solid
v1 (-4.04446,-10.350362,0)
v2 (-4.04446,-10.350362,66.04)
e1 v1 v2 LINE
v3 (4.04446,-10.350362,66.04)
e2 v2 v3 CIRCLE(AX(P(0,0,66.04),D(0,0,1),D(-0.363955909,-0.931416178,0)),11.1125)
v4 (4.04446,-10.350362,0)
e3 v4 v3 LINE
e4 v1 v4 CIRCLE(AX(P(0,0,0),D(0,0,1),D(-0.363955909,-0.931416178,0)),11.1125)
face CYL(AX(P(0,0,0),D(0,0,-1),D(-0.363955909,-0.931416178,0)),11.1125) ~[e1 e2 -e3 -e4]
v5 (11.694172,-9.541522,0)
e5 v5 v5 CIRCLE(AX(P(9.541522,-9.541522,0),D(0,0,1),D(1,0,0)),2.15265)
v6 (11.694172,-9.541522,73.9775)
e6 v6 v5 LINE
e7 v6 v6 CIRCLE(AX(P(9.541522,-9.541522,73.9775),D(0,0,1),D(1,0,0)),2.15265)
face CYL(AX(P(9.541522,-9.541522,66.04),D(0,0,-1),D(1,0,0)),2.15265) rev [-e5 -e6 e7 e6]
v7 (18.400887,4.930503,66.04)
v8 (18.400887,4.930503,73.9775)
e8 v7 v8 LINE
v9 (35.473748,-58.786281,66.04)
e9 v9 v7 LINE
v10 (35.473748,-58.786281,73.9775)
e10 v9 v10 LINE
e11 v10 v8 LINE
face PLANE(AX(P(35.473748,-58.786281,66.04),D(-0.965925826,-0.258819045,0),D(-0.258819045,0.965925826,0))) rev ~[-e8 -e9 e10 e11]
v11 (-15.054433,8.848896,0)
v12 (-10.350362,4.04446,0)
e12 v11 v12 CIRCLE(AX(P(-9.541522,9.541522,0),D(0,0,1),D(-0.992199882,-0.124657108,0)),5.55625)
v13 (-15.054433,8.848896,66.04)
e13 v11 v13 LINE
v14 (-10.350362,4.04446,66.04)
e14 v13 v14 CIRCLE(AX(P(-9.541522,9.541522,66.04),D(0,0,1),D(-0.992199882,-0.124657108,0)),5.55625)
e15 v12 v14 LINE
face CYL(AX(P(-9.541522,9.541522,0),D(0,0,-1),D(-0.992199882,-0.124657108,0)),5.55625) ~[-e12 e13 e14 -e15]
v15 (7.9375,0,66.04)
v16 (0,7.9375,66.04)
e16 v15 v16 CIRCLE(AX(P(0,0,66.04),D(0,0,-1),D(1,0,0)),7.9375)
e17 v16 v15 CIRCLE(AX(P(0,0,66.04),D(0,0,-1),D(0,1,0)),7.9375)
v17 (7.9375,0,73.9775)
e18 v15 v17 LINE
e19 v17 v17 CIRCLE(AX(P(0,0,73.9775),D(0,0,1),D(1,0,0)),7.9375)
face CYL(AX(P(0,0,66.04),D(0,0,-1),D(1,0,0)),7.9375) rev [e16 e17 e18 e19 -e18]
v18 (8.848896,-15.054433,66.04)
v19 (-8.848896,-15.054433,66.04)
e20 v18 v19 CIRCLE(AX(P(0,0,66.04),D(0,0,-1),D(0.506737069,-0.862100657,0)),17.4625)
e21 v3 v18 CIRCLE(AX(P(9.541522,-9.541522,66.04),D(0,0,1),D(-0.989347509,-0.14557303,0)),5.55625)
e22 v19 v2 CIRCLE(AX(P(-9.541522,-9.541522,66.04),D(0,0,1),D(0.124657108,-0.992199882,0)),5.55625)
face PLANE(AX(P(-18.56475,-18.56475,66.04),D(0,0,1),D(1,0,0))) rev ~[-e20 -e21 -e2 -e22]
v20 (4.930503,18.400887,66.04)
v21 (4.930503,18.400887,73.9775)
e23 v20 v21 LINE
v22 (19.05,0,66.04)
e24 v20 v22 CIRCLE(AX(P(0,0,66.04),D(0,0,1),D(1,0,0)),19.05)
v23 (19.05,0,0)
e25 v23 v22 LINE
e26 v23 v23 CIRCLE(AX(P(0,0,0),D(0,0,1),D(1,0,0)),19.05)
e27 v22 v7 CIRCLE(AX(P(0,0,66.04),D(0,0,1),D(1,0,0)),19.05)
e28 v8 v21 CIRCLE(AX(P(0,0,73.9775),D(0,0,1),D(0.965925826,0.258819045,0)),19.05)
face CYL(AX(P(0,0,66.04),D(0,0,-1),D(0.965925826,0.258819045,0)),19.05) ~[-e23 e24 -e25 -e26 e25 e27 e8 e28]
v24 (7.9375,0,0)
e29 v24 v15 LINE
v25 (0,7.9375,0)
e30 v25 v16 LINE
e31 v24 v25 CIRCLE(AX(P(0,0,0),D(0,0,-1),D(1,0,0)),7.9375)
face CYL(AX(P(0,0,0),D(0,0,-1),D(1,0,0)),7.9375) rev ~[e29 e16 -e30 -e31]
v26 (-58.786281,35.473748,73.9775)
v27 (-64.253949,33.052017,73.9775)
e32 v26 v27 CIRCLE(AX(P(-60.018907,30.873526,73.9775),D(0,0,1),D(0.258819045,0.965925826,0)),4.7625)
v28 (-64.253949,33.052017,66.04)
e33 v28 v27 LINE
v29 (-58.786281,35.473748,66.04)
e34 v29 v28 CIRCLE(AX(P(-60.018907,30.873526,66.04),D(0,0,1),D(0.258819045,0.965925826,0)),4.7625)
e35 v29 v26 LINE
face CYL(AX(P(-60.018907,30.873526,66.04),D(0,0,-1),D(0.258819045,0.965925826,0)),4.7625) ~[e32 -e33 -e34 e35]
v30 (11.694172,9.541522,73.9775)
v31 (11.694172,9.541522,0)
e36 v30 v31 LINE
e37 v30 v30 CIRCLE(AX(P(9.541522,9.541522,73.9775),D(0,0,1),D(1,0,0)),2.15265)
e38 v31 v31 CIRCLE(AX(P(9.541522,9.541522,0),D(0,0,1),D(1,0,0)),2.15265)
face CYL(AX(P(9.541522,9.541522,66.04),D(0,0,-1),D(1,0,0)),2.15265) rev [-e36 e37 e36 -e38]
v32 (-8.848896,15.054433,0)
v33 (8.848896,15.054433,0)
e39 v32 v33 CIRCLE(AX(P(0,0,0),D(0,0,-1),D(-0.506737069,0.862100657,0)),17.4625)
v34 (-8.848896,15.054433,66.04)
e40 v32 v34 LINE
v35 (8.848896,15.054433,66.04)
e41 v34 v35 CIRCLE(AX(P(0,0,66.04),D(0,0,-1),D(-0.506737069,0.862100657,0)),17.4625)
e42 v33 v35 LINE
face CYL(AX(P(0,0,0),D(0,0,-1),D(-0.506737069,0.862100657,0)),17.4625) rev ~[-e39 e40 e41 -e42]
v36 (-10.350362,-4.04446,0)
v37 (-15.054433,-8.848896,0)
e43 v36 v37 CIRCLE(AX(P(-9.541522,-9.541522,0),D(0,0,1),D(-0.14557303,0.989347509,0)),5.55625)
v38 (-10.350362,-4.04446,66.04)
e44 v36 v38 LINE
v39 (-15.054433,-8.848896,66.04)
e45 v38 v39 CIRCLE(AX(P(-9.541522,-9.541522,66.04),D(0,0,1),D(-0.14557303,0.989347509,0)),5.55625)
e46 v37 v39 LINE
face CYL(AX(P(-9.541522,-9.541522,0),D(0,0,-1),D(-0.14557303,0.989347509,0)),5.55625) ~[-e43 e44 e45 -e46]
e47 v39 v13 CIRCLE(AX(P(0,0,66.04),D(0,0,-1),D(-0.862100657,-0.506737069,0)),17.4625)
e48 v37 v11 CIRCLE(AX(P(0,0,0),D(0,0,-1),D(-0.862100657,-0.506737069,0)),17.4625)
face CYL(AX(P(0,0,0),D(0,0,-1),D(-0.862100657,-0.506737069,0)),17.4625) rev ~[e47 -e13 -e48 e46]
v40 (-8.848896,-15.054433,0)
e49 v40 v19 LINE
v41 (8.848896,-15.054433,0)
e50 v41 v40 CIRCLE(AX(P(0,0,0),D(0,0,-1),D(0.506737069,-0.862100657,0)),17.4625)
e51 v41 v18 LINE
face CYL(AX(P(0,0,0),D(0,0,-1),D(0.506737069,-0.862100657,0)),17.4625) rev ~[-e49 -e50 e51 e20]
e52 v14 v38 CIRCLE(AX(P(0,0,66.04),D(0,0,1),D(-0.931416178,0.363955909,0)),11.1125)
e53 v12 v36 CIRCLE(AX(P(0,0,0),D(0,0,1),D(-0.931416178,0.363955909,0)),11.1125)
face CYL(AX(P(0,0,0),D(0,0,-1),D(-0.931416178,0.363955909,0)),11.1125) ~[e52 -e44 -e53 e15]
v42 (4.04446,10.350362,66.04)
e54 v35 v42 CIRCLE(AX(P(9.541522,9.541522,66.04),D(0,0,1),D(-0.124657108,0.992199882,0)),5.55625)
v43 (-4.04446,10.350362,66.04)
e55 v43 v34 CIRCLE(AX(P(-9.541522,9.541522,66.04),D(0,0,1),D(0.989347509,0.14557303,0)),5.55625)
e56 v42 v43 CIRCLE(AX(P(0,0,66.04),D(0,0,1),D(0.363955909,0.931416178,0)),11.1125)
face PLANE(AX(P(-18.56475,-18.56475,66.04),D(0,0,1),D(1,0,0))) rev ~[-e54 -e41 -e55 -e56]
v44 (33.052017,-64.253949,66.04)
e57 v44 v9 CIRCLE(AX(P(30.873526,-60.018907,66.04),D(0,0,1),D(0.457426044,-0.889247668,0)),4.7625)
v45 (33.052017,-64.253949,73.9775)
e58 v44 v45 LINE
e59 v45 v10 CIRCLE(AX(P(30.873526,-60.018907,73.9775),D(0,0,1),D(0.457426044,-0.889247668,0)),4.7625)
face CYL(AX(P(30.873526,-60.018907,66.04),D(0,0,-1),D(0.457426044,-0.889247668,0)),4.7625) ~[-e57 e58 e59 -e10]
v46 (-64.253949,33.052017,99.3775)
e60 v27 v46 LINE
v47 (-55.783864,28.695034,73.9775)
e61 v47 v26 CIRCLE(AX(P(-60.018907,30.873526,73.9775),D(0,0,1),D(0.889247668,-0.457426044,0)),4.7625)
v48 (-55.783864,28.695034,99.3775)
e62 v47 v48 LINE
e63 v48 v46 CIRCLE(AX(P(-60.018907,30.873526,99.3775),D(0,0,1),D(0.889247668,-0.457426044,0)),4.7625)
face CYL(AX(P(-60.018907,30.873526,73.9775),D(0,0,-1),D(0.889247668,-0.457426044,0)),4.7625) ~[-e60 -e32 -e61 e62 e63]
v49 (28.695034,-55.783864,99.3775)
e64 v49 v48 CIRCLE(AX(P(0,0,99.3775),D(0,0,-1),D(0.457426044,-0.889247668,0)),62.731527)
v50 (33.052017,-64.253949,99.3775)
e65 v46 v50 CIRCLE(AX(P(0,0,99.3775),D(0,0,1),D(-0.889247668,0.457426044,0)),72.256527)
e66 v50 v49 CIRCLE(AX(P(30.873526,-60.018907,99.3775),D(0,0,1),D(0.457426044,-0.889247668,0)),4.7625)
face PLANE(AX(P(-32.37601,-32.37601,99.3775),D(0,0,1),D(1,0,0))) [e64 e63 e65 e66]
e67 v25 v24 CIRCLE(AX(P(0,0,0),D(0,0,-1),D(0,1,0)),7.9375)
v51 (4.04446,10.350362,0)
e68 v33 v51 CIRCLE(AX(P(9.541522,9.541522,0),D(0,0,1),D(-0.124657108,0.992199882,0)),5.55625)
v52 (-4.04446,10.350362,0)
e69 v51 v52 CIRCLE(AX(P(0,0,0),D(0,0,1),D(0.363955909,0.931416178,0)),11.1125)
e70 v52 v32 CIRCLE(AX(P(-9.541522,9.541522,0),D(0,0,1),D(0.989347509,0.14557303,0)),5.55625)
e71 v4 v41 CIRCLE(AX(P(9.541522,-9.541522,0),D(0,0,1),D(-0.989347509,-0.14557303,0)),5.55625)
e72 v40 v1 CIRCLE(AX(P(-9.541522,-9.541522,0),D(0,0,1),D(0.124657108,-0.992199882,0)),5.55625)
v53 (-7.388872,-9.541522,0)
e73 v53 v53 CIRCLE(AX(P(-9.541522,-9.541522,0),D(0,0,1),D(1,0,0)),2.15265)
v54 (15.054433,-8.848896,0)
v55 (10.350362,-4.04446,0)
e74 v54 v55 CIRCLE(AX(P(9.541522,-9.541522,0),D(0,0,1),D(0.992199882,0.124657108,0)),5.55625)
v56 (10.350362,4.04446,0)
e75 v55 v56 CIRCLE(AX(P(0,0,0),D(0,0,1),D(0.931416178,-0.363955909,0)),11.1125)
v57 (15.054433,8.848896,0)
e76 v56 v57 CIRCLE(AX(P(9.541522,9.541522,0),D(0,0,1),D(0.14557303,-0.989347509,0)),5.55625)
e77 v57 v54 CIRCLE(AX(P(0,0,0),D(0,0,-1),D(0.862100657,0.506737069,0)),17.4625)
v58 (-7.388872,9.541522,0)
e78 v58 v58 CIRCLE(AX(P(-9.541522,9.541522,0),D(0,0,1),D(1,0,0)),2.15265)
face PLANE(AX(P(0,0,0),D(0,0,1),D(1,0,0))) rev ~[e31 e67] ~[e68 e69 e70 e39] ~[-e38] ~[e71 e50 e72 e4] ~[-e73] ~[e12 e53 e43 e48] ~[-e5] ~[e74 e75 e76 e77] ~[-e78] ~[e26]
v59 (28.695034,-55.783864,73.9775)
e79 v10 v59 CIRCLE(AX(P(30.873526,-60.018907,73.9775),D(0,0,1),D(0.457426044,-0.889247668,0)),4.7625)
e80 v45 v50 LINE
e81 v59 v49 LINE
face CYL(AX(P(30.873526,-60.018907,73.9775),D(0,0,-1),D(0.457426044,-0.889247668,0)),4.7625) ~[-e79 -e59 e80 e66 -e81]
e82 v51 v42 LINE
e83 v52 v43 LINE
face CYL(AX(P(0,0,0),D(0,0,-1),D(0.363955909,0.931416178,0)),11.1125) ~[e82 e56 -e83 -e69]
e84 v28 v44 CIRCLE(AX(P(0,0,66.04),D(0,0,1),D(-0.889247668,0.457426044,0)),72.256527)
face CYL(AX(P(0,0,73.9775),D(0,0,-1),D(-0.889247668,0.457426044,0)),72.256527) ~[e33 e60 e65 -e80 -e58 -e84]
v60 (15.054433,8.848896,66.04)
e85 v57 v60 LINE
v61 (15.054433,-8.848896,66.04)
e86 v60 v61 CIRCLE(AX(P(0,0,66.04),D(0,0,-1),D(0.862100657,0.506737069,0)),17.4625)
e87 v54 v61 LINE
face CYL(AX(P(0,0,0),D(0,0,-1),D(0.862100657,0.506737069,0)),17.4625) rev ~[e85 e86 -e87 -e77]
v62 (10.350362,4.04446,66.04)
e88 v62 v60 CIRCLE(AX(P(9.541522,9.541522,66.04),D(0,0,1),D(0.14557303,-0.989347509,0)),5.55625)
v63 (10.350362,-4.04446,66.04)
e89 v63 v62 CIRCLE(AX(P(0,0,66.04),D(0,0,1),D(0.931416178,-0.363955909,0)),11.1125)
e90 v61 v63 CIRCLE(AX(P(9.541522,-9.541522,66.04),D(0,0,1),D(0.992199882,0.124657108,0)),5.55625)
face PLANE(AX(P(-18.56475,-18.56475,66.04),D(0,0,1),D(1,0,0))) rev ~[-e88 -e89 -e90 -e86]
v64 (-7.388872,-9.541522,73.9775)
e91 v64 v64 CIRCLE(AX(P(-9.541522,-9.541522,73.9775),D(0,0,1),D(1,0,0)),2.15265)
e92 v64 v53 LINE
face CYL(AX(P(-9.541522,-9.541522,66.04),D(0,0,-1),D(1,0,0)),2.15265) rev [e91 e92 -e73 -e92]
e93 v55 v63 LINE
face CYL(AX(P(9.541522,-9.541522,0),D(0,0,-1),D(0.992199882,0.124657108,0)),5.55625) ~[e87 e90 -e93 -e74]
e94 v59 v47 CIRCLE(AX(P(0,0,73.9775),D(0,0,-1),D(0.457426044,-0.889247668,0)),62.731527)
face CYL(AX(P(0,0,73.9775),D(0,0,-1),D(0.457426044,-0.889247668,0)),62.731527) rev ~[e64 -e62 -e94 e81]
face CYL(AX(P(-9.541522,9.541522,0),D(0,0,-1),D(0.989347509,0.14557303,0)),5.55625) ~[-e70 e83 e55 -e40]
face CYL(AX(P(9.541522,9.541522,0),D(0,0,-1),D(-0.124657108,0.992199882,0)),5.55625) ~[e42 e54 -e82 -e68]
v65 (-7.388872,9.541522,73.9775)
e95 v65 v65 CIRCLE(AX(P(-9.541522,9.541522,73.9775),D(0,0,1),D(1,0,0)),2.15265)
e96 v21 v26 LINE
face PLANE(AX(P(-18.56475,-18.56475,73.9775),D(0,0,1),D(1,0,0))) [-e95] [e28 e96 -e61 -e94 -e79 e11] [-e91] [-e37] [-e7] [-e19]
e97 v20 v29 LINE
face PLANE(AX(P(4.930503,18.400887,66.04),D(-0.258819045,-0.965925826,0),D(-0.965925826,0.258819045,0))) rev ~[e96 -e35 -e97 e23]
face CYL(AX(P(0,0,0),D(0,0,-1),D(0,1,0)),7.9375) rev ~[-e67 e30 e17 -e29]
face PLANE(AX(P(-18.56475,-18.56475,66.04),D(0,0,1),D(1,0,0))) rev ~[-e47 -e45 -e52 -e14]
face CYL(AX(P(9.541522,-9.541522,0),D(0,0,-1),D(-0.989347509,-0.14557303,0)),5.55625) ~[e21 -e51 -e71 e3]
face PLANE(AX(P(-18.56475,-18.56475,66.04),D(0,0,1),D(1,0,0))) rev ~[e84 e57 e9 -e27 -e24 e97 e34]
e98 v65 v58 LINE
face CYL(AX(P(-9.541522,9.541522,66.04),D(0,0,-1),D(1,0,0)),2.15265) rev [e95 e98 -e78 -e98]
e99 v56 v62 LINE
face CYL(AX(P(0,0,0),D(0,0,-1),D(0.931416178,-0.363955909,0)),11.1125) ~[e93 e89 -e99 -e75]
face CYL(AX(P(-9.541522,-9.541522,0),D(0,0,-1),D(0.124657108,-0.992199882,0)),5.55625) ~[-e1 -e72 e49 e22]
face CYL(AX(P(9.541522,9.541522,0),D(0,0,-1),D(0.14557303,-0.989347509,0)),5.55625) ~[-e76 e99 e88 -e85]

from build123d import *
from build123d import SkipClean  # not in build123d's __all__

# Parameters (mm, degrees)
F0_R     = 19.05
F0_R_2   = 2.15265
F1_DEPTH = 66.04
F3_DEPTH = 66.04
F4_COUNT = 4
F4_ANGLE = 270
F5_R     = 2.15265
F5_R_2   = 7.9375
F6_DEPTH = 7.9375
F8_DEPTH = 25.4


# Not quite as in the source:
# - after a boolean that leaves OpenCascade's solid faulty, fix() repairs it


with BuildPart() as f1:
    # F0 (on Top) → F1 (new body)
    with BuildSketch(Plane.XY):
        Circle(F0_R)
        with Locations((-9.5415221286, -9.5415221286)):
            Circle(F0_R_2, mode=Mode.SUBTRACT)
        with Locations((9.5415221286, -9.5415221286)):
            Circle(F0_R_2, mode=Mode.SUBTRACT)
        with Locations((-9.5415221286, 9.5415221286)):
            Circle(F0_R_2, mode=Mode.SUBTRACT)
        with BuildLine():
            ThreePointArc((0, 7.9375), (5.6126600757, 5.6126600757), (7.9375, 0))
            ThreePointArc((7.9375, 0), (-5.6126600757, -5.6126600757), (0, 7.9375))
        make_face(mode=Mode.SUBTRACT)
        with Locations((9.5415221286, 9.5415221286)):
            Circle(F0_R_2, mode=Mode.SUBTRACT)
    extrude(amount=F1_DEPTH)

    # F2 (on face) → F3 (cut, through all)
    with BuildSketch(Plane(origin=(0, 0, 0), x_dir=(1, 0, 0), z_dir=(0, 0, -1))):
        with BuildLine():
            ThreePointArc((8.8488960712, -15.0544327217), (5.6543471209, -13.5116335278), (4.0444600337, -10.350362278))
            ThreePointArc((4.0444600337, -10.350362278), (0, -11.1125), (-4.0444600337, -10.350362278))
            ThreePointArc((-4.0444600337, -10.350362278), (-5.6543471209, -13.5116335278), (-8.8488960712, -15.0544327217))
            ThreePointArc((-8.8488960712, -15.0544327217), (0, -17.4625), (8.8488960712, -15.0544327217))
        make_face()
    f3 = extrude(amount=-F3_DEPTH, mode=Mode.SUBTRACT)

    # F4: F3 ×4 about axis
    f4_axis = Axis((0, 0, 0), (0, 0, -1))
    for i in range(1, F4_COUNT):
        add(f3.rotate(f4_axis, i * F4_ANGLE / (F4_COUNT - 1)), clean=False, mode=Mode.SUBTRACT)

    # F5 (on face) → F6 (join)
    with BuildSketch(Plane.XY.offset(66.04)):
        with BuildLine():
            Line((35.4737477046, -58.7862808051), (18.4008869908, 4.9305028092))
            ThreePointArc((18.4008869908, 4.9305028092), (13.4703841816, 13.4703841816), (4.9305028092, 18.4008869908))
            Line((4.9305028092, 18.4008869908), (-58.7862808051, 35.4737477046))
            ThreePointArc((-58.7862808051, 35.4737477046), (-61.9475900585, 35.228016284), (-64.2539485249, 33.05201749))
            ThreePointArc((-64.2539485249, 33.05201749), (-51.093080555, -51.093080555), (33.05201749, -64.2539485249))
            ThreePointArc((33.05201749, -64.2539485249), (35.228016284, -61.9475900585), (35.4737477046, -58.7862808051))
        make_face()
        with Locations((-9.5415221286, -9.5415221286)):
            Circle(F5_R, mode=Mode.SUBTRACT)
        Circle(F5_R_2, mode=Mode.SUBTRACT)
        with Locations((9.5415221286, -9.5415221286)):
            Circle(F5_R, mode=Mode.SUBTRACT)
        with Locations((-9.5415221286, 9.5415221286)):
            Circle(F5_R, mode=Mode.SUBTRACT)
        with Locations((9.5415221286, 9.5415221286)):
            Circle(F5_R, mode=Mode.SUBTRACT)
    with SkipClean():  # cleaning this boolean's faces spoils the solid; the shape is the same uncleaned
        extrude(amount=F6_DEPTH)

    # F7 (on face) → F8 (join)
    with BuildSketch(Plane.XY.offset(73.9775)):
        with BuildLine():
            ThreePointArc((-55.7838644899, 28.6950344237), (-57.8404149742, 35.1085679744), (-64.2539485249, 33.05201749))
            ThreePointArc((-64.2539485249, 33.05201749), (-51.093080555, -51.093080555), (33.05201749, -64.2539485249))
            ThreePointArc((33.05201749, -64.2539485249), (35.1085679744, -57.8404149742), (28.6950344237, -55.7838644899))
            ThreePointArc((28.6950344237, -55.7838644899), (-44.3578884642, -44.3578884642), (-55.7838644899, 28.6950344237))
        make_face()
    extrude(amount=F8_DEPTH)

    add(f1.part.fix(), mode=Mode.REPLACE)


solid = f1.part
